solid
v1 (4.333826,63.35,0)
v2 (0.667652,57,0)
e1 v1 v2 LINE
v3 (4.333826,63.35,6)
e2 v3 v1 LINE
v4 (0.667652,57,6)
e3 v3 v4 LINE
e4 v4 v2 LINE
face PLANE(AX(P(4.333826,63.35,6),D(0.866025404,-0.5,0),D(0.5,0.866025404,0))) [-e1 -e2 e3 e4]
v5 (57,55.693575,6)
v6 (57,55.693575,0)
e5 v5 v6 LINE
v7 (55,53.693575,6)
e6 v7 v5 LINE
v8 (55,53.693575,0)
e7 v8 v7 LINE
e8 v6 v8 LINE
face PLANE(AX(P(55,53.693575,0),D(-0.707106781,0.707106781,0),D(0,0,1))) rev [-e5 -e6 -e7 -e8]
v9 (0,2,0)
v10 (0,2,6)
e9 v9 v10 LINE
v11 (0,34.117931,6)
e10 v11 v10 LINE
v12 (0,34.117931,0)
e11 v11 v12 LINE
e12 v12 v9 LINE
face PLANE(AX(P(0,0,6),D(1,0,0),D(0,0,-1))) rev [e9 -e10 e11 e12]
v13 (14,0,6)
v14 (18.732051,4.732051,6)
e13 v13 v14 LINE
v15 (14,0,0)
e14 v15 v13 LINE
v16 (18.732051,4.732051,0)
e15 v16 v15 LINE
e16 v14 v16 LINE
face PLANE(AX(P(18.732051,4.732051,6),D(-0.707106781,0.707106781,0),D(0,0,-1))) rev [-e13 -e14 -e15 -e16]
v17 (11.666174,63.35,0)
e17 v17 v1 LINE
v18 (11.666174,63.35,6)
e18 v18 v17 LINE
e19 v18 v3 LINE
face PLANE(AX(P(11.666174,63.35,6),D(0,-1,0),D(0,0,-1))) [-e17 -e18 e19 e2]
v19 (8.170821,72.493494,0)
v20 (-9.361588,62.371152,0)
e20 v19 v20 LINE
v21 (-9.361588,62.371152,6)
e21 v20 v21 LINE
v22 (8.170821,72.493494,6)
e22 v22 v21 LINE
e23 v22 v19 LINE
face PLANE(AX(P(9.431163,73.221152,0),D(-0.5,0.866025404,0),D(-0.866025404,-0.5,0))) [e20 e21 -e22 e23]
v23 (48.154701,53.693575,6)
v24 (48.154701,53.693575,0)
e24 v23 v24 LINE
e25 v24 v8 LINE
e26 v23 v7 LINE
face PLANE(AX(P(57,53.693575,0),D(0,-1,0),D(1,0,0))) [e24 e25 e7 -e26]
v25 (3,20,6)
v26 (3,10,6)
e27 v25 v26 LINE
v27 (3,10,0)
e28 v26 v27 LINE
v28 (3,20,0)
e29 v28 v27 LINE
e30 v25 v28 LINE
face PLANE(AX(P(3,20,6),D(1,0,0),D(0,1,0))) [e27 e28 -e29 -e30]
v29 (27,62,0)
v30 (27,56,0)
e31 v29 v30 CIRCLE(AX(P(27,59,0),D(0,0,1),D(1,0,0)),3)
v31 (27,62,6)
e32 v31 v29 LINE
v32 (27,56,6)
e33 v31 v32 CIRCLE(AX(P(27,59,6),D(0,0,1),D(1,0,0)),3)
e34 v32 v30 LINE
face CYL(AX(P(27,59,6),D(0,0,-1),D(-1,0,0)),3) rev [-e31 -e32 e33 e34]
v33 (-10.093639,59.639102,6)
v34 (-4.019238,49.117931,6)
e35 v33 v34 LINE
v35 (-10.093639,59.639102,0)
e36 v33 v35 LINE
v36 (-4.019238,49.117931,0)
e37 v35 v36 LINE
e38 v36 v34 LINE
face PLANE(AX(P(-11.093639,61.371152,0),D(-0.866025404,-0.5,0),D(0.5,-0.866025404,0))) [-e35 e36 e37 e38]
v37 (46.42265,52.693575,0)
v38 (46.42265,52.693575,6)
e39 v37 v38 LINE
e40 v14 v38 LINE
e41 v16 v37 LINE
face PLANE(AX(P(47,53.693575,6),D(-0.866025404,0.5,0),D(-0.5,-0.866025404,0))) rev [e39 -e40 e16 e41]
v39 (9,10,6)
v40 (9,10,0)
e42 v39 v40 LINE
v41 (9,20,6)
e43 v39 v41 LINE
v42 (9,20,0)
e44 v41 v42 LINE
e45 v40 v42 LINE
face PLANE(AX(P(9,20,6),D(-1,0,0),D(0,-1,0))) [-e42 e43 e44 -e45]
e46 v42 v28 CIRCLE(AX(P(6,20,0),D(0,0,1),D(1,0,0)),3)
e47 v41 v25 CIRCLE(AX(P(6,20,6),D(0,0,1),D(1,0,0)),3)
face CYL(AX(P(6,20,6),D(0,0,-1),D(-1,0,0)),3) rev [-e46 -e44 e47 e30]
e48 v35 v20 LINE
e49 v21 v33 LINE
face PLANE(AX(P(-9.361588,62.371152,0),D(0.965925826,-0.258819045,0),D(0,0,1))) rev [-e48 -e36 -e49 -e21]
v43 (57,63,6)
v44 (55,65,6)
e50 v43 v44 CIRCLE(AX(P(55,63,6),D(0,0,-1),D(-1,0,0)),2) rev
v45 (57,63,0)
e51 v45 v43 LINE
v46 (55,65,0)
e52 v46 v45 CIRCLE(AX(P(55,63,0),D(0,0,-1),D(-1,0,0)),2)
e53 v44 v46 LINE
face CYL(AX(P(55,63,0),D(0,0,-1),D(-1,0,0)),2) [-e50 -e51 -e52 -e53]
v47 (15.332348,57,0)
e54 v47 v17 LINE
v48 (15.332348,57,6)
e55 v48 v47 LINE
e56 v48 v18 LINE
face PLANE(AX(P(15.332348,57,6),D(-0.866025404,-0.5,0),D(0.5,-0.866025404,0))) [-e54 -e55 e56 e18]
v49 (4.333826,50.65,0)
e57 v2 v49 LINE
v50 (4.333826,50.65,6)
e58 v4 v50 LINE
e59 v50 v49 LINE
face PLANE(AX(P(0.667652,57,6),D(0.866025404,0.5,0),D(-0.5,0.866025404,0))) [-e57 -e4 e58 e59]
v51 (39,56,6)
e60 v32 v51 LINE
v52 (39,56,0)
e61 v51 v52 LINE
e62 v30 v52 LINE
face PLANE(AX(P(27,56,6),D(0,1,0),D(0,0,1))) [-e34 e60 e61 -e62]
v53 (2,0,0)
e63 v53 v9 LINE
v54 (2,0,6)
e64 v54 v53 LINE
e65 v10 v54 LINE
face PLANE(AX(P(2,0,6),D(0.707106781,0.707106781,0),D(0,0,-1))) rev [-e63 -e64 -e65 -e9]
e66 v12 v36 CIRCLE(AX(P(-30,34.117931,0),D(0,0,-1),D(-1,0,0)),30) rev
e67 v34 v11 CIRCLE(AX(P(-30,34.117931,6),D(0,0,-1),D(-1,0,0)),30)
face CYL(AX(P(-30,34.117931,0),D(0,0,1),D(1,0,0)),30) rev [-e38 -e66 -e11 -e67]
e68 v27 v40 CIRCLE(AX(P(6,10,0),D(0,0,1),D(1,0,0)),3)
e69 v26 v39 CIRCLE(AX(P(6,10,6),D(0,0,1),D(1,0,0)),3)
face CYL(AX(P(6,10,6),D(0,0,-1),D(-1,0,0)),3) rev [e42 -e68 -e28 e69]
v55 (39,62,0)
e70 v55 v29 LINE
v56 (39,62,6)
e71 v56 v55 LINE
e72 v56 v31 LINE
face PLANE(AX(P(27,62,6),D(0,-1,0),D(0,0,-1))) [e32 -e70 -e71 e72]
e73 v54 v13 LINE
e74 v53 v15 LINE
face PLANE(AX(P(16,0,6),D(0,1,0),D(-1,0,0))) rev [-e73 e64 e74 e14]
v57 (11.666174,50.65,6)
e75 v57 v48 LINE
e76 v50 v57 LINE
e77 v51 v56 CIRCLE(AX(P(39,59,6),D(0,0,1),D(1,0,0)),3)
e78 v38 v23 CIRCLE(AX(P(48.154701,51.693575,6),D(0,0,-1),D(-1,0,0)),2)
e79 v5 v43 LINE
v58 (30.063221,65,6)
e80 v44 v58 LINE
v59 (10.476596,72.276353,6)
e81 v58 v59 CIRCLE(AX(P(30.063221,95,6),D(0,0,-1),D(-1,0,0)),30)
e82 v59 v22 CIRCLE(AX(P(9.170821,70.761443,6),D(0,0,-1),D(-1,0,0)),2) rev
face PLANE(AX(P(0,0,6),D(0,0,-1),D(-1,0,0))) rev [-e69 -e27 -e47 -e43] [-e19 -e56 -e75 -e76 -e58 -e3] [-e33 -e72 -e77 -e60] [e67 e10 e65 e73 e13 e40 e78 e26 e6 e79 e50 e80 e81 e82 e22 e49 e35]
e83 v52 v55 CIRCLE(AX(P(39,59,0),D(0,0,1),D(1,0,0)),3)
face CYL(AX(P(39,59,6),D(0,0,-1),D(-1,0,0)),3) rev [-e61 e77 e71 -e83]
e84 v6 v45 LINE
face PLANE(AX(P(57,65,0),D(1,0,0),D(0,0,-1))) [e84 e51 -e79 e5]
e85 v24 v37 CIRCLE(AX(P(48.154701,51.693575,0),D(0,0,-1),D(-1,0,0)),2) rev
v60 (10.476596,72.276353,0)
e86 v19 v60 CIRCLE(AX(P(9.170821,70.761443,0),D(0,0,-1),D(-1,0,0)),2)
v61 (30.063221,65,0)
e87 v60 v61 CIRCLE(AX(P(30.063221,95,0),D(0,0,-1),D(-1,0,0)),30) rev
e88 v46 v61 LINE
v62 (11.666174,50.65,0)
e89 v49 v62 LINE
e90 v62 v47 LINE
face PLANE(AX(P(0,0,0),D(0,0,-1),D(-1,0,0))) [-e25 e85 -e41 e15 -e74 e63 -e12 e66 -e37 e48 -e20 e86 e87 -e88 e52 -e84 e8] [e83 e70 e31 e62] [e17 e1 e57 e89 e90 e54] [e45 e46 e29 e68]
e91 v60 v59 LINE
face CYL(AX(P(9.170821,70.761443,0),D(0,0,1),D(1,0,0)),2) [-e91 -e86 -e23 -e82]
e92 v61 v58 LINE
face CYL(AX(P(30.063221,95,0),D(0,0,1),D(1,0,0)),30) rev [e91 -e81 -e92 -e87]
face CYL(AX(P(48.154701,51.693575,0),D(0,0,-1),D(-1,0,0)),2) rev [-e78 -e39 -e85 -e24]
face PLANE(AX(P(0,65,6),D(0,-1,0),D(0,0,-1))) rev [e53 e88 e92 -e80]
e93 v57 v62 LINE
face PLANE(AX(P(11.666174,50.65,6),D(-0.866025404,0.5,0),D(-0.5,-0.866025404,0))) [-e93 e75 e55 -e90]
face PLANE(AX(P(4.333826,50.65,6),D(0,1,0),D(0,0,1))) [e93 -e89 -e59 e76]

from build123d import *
from OCP.BRepFilletAPI import BRepFilletAPI_MakeChamfer

# Parameters (mm, degrees)
RESSALTO_EXTRUS_O1_DEPTH = 6
RESSALTO_EXTRUS_O2_DEPTH = 6
FILETE1_R                = 30
CHANFRO1_SIZE            = 2
CHANFRO1_SIZE2           = 5.464101615
FILETE2_R                = 2
RESSALTO_EXTRUS_O3_DEPTH = 6
FILETE3_R                = 2
CHANFRO2_SIZE            = 2


with BuildPart() as part:
    # Esboço1 → Ressalto-extrusão1 (new body)
    with BuildSketch(Plane.XY):
        Polygon((0, 0), (0, 65), (47, 65), (47, 53.693575035), (16, 0), align=None)
        Polygon((4.333825791, 50.65), (11.666174209, 50.65), (15.332348419, 57), (11.666174209, 63.35), (4.333825791, 63.35), (0.667651581, 57), align=None, mode=Mode.SUBTRACT)
        with BuildLine():
            Line((9, 20), (9, 10))
            ThreePointArc((9, 10), (6, 7), (3, 10))
            Line((3, 10), (3, 20))
            ThreePointArc((3, 20), (6, 23), (9, 20))
        make_face(mode=Mode.SUBTRACT)
        with BuildLine():
            Line((27, 62), (39, 62))
            ThreePointArc((39, 62), (42, 59), (39, 56))
            Line((39, 56), (27, 56))
            ThreePointArc((27, 56), (24, 59), (27, 62))
        make_face(mode=Mode.SUBTRACT)
    extrude(amount=RESSALTO_EXTRUS_O1_DEPTH)

    # Esboço2 → Ressalto-extrusão2 (add, through all)
    with BuildSketch(Plane.XY.offset(6)):
        Polygon((14.17764788, 65), (9.431163316, 73.221152423), (-11.093638754, 61.371152423), (0, 42.156406461), (0, 65), align=None)
    extrude(amount=-RESSALTO_EXTRUS_O2_DEPTH)

    # Filete1
    # the kernel refuses this fillet: 30 mm, written as the material it adds along each edge
    with BuildSketch(Plane(origin=(0, 42.156406461, 6), x_dir=(0, -1, 0), z_dir=(0, 0, -1))) as filete1_piece_1:
        with BuildLine():
            CenterArc((FILETE1_R * 0.267949192431, FILETE1_R), FILETE1_R, 240, 30)
            Line((-FILETE1_R * 0.232050807569, FILETE1_R * 0.133974596216), (-FILETE1_R * 0.242050807569, FILETE1_R * 0.11665408814))
            Line((-FILETE1_R * 0.242050807569, FILETE1_R * 0.11665408814), (-FILETE1_R * 0.00535898384862, -FILETE1_R * 0.02))
            Line((-FILETE1_R * 0.00535898384862, -FILETE1_R * 0.02), (FILETE1_R * 0.267949192431, -FILETE1_R * 0.02))
            Line((FILETE1_R * 0.267949192431, -FILETE1_R * 0.02), (FILETE1_R * 0.267949192431, 0))
        make_face()
    extrude(amount=6)
    with BuildSketch(Plane(origin=(14.17764788, 65, 6), x_dir=(1, 0, 0), z_dir=(0, 0, -1))) as filete1_piece_2:
        with BuildLine():
            CenterArc((15.885572973, -30), FILETE1_R, 90, 43.451100673)
            Line((-4.746484564, -8.221152423), (-5.159125715, -7.785575471))
            ThreePointArc((-5.159125715, -7.785575471), (-2.892857524, -3.810576211), (-0.519615242, 0.3))
            Line((-0.519615242, 0.3), (0, 0.6))
            Line((0, 0.6), (15.885572973, 0.6))
            Line((15.885572973, 0.6), (15.885572973, 0))
        make_face()
    extrude(amount=6)

    # Chanfro1: one chamfer whose edges measure the first distance from different faces: ONE call of the kernel's chamfer builder (chamfer() names one face for all edges)
    chanfro1_edges_1 = [part.edges().sort_by_distance(p)[0] for p in [
        (-11.093638754, 61.371152423, 3),
        (0, 0, 3),
        (47, 65, 3),
    ]]
    chanfro1_edges_2 = [part.edges().sort_by_distance(p)[0] for p in [
        (16, 0, 3),
    ]]
    chanfro1_side_2 = [part.faces().sort_by_distance(p)[0] for p in [
        (8, 0, 3),
    ]]
    chanfro1 = BRepFilletAPI_MakeChamfer(part.part.solid().wrapped)
    for e in chanfro1_edges_1:
        chanfro1.Add(CHANFRO1_SIZE, e.wrapped)
    for e in chanfro1_edges_2:
        chanfro1.Add(CHANFRO1_SIZE, CHANFRO1_SIZE2, e.wrapped, chanfro1_side_2[0].wrapped)  # the first distance lies on this face
    add(Compound.cast(chanfro1.Shape()), mode=Mode.REPLACE)

    # Filete2
    filete2_edges = [part.edges().sort_by_distance(p)[0] for p in [
        (9.431163316, 73.221152423, 3),
    ]]
    fillet(filete2_edges, radius=FILETE2_R)

    # Esboço3 → Ressalto-extrusão3 (add, through all)
    with BuildSketch(Plane.XY.offset(6)):
        Polygon((45, 65), (57, 65), (57, 53.693575035), (47, 53.693575035), (47, 63), align=None)
    extrude(amount=-RESSALTO_EXTRUS_O3_DEPTH)

    # Filete3
    filete3_edges = [part.edges().sort_by_distance(p)[0] for p in [
        (57, 65, 3),
        (47, 53.693575035, 3),
    ]]
    fillet(filete3_edges, radius=FILETE3_R)

    # Chanfro2
    chanfro2_edges = [part.edges().sort_by_distance(p)[0] for p in [
        (57, 53.693575035, 3),
    ]]
    chamfer(chanfro2_edges, length=CHANFRO2_SIZE)


solid = part.part
